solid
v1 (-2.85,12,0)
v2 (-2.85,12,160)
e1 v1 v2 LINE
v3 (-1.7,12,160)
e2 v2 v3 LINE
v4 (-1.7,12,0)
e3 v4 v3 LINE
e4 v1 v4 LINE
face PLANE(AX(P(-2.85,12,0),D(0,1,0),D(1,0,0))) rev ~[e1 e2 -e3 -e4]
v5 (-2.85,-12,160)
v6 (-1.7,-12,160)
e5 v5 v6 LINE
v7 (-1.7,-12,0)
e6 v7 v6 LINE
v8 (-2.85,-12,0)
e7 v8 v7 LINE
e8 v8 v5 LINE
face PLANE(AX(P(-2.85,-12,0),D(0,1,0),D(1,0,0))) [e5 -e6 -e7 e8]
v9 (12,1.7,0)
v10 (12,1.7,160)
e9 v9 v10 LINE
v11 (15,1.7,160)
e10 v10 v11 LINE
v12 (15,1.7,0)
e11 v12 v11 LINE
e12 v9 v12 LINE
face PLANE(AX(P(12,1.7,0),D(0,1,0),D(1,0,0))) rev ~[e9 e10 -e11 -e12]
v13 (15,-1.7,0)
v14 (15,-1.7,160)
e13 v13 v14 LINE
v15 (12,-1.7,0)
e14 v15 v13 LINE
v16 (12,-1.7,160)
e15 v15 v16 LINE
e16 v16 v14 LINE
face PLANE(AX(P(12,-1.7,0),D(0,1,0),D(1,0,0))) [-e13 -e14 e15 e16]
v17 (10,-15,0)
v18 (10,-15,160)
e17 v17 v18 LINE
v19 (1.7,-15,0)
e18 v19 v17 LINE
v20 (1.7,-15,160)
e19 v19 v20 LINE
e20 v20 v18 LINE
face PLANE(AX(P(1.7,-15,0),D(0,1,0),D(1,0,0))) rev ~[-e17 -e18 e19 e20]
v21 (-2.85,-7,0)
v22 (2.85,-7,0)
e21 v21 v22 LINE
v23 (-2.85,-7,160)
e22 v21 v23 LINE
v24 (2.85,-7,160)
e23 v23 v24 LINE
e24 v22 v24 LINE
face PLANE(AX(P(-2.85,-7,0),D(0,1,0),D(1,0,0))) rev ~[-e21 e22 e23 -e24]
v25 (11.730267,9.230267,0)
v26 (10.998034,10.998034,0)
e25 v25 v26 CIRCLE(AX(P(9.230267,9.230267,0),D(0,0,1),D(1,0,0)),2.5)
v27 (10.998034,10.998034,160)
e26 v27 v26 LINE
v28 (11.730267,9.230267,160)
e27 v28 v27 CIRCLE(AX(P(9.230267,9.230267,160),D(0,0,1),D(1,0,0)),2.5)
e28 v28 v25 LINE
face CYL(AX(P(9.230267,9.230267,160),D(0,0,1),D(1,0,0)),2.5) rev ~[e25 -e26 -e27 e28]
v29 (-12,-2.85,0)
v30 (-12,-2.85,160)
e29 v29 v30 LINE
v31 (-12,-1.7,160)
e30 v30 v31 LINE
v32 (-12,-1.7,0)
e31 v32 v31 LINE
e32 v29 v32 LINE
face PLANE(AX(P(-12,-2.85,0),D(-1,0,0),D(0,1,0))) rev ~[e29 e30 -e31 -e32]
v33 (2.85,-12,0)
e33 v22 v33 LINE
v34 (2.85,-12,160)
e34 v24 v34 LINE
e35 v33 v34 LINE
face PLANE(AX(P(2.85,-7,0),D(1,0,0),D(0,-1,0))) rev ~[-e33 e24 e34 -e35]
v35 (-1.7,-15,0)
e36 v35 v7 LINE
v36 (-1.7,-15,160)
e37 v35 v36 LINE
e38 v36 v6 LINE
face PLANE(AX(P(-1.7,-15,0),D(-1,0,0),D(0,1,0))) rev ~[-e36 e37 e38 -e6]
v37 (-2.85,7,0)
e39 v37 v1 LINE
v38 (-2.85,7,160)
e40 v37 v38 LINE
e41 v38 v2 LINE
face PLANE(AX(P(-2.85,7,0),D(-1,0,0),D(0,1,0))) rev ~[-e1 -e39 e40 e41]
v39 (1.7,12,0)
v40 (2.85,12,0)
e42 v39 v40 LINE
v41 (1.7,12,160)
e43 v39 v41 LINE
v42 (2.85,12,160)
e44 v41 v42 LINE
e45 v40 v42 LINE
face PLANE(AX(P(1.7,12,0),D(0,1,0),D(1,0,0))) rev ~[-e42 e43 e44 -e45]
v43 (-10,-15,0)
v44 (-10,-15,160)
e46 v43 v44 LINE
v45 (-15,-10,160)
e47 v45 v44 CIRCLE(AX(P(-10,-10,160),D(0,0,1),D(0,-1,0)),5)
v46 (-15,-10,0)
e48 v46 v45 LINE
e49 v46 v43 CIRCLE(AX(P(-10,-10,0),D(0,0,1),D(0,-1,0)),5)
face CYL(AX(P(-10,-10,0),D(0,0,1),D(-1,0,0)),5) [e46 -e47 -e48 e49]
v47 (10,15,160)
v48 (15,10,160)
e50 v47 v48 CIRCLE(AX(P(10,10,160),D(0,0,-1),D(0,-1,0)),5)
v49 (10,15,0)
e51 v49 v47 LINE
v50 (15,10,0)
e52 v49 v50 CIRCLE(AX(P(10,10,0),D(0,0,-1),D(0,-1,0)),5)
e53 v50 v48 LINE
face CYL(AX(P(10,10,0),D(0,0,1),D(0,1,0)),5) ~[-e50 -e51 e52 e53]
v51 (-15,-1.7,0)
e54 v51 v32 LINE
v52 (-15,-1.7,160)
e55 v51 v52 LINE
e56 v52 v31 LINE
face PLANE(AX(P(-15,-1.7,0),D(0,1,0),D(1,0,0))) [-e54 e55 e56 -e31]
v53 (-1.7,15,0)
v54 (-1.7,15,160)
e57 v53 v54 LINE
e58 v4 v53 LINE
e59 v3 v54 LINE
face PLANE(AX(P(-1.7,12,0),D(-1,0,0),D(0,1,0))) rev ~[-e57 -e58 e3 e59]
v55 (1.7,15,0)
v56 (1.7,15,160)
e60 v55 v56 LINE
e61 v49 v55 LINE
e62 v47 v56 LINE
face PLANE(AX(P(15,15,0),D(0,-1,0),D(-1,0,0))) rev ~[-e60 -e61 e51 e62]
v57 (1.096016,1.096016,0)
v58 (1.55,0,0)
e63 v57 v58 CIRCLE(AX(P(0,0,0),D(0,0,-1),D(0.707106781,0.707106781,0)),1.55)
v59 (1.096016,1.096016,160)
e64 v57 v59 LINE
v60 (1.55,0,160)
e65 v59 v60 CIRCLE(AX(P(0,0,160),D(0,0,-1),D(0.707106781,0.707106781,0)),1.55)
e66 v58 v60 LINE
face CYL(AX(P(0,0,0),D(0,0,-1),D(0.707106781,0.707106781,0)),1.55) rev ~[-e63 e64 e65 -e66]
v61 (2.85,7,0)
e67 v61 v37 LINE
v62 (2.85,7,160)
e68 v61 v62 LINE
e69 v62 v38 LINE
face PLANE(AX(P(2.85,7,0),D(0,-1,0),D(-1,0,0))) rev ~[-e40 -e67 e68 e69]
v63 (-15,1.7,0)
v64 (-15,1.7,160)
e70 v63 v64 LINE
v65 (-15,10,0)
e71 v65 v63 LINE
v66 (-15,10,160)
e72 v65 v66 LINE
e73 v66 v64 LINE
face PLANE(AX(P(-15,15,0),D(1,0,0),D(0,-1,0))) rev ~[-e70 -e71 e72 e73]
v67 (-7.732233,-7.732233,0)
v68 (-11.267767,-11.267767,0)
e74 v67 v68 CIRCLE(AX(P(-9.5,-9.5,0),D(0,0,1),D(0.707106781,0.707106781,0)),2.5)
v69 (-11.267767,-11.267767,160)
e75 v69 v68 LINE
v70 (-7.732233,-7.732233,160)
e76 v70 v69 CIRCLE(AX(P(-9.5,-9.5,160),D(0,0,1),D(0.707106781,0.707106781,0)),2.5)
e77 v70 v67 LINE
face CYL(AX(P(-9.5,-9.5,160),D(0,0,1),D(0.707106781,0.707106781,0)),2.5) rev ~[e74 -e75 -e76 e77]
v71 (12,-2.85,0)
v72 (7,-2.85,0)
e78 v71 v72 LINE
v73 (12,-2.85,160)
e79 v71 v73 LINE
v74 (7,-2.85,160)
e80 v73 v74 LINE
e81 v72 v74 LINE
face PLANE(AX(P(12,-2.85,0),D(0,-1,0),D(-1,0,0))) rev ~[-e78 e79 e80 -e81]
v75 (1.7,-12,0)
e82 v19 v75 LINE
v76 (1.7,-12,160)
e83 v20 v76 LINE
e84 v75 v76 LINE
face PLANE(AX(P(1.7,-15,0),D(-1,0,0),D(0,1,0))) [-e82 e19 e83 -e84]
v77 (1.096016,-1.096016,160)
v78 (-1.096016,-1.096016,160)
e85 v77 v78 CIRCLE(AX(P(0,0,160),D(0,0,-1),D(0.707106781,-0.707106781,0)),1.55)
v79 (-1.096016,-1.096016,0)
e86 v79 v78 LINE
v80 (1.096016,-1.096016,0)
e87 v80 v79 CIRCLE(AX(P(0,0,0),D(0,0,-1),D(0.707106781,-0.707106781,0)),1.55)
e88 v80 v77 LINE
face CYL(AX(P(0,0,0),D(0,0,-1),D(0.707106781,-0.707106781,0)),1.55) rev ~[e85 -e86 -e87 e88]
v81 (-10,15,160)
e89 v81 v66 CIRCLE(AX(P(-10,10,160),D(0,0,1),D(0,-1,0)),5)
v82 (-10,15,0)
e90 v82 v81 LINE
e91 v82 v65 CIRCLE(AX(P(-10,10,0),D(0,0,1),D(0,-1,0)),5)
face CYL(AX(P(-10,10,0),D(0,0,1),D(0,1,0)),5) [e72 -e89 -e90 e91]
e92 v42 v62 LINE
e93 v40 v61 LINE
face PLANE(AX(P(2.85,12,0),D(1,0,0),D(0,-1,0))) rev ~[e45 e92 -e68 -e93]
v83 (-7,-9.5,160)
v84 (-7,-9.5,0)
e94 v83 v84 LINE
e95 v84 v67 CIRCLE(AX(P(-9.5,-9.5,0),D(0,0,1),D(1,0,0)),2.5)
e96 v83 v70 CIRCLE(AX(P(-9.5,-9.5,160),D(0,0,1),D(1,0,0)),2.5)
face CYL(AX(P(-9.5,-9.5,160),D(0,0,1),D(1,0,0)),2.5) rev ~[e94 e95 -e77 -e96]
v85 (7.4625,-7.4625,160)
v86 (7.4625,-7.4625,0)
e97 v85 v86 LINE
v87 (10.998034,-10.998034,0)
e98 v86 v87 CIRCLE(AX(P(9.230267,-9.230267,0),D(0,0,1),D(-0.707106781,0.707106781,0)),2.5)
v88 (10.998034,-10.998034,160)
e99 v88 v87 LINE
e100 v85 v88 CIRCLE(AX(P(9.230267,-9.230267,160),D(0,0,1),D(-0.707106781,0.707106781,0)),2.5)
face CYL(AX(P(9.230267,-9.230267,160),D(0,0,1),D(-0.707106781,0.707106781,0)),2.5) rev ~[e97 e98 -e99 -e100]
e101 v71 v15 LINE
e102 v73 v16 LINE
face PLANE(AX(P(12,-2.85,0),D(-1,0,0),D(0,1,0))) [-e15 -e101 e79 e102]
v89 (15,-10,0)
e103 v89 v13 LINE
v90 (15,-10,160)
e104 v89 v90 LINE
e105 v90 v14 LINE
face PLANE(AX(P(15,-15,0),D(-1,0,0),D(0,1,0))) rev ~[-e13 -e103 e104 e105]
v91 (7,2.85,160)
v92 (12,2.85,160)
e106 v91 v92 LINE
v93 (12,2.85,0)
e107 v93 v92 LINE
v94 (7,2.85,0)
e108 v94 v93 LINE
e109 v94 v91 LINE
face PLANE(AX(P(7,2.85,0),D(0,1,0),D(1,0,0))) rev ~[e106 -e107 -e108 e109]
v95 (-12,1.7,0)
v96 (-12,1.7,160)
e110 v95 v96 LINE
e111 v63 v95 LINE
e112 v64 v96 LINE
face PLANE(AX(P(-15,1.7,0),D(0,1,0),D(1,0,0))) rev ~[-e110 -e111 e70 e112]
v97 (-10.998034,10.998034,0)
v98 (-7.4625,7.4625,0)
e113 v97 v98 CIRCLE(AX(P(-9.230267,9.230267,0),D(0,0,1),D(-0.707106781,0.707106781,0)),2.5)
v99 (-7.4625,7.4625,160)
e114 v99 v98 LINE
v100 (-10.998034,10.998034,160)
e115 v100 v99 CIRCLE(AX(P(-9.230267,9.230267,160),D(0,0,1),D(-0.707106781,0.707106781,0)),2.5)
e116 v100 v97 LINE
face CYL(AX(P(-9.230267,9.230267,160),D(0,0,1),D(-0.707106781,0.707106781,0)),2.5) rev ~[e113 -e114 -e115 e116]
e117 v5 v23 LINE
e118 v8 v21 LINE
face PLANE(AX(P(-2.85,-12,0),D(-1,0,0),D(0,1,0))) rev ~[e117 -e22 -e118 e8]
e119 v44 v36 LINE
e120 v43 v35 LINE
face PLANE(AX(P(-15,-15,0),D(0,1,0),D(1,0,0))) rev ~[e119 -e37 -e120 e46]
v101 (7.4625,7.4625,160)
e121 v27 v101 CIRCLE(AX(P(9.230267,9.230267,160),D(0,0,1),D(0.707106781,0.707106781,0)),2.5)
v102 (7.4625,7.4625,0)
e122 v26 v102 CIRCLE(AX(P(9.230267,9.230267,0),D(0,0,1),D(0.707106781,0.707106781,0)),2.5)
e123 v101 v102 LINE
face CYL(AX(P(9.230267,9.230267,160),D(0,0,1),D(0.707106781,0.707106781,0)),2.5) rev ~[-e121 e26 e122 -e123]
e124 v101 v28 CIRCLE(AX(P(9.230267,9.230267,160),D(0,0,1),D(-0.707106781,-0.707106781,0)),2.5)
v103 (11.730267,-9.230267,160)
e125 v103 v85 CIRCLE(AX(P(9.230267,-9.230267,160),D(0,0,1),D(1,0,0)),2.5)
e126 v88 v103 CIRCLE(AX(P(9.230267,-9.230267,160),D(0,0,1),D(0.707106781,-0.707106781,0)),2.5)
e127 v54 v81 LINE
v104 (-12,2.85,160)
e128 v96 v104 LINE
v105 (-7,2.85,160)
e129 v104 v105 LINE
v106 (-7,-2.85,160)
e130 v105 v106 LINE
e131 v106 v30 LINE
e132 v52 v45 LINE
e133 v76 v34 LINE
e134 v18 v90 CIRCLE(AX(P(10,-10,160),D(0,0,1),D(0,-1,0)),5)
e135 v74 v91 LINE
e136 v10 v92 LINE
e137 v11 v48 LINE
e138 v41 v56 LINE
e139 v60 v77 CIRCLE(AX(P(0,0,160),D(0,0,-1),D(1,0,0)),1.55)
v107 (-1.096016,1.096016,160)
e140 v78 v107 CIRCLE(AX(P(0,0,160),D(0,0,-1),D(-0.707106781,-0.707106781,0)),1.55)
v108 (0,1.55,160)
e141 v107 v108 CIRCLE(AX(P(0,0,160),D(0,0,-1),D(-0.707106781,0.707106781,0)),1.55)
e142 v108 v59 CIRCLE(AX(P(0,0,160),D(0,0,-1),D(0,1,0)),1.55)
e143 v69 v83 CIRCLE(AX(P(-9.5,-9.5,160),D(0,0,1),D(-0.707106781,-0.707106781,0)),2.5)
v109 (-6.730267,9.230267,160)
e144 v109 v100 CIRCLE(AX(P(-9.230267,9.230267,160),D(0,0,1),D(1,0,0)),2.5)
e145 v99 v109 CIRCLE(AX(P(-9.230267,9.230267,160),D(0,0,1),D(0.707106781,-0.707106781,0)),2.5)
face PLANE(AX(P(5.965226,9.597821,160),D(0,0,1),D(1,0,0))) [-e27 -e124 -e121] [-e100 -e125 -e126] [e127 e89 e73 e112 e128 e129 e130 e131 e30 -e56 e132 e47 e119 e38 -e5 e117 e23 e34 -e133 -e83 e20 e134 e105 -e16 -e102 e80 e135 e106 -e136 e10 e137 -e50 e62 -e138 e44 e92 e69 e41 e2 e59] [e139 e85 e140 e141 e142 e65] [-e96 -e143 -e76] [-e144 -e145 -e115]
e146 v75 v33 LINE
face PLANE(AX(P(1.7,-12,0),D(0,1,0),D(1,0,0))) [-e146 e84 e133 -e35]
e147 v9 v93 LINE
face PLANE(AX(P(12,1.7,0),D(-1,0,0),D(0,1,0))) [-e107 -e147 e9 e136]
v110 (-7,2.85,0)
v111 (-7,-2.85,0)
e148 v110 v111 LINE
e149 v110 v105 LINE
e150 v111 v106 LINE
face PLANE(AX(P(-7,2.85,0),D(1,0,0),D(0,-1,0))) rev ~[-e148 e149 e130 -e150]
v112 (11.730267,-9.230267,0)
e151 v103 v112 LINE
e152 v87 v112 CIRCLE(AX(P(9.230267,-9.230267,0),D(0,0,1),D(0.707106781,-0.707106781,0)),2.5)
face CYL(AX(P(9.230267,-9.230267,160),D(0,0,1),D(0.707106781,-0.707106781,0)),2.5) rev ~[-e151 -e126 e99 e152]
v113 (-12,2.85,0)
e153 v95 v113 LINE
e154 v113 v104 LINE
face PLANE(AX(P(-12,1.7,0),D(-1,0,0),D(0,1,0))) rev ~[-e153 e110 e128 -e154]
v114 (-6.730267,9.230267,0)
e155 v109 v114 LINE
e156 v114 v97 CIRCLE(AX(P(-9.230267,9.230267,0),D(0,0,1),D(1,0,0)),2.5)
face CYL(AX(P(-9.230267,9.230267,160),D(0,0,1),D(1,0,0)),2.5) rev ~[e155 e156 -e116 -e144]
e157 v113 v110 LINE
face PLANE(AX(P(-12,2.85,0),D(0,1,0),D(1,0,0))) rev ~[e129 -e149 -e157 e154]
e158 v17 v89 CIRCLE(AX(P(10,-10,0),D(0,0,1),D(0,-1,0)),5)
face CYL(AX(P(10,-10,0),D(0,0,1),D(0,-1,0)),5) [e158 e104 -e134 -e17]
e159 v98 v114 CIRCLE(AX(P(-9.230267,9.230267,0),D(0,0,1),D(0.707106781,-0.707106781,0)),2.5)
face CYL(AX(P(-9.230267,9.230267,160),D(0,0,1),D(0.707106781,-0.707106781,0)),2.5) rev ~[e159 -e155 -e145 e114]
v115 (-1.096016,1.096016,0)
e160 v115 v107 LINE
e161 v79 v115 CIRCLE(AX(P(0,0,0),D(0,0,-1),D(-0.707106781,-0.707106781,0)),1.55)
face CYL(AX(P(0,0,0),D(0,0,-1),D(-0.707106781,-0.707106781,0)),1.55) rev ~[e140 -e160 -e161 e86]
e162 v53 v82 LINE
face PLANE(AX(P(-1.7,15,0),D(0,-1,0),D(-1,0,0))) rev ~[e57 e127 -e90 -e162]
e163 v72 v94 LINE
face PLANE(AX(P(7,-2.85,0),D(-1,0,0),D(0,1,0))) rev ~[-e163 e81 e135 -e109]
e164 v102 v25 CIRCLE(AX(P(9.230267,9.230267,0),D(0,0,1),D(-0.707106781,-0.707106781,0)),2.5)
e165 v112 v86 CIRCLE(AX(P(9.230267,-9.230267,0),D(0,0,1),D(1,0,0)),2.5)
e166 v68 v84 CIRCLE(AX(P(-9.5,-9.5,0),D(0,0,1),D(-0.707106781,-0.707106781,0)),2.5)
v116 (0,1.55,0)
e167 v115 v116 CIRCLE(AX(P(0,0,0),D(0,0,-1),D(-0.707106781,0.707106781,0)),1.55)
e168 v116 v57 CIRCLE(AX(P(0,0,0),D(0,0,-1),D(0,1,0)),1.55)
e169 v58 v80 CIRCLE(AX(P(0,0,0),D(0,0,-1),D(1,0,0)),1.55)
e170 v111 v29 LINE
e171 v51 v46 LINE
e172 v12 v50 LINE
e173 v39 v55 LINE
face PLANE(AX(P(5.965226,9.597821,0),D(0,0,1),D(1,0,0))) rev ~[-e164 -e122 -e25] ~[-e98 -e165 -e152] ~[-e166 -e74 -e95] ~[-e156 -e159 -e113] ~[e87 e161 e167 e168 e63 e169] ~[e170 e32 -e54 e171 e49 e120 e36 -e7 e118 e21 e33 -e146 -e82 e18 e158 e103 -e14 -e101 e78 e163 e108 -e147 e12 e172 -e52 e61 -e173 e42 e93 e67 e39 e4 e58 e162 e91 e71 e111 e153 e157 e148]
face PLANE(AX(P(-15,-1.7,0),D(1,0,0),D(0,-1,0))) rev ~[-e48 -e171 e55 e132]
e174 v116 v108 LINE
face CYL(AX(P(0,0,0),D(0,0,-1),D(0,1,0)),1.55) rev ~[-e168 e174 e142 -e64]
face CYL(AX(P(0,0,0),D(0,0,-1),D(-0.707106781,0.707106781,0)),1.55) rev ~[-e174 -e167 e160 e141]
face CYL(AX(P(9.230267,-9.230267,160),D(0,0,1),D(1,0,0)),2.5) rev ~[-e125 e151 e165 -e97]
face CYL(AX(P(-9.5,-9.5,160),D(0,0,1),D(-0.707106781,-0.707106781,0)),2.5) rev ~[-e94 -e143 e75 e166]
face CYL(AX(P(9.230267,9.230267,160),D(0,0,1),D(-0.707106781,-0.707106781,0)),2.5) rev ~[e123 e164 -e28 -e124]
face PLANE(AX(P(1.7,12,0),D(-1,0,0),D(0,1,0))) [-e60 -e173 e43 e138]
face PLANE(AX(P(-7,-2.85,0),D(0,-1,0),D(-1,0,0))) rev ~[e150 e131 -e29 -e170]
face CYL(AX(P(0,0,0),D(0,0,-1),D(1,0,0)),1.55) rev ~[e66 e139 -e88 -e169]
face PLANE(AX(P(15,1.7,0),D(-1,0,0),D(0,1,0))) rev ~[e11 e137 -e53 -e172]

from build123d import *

# Parameters (mm, degrees)
F0_W     = 1.15
F0_H     = 3
F0_W_2   = 3
F0_H_2   = 1.15
F1_DEPTH = 160
F2_R     = 5
F4_DEPTH = 200


with BuildPart() as f1:
    # F0 (on Top) → F1 (new body)
    with BuildSketch(Plane.XY):
        with BuildLine():
            Line((7.5, 7.5), (15, 15))
            Line((15, 15), (2.85, 15))
            Line((2.85, 15), (2.85, 12))
            Line((2.85, 12), (2.85, 7))
            Line((2.85, 7), (0, 7))
            Line((0, 7), (0, 1.55))
            ThreePointArc((0, 1.55), (0.5931593202, 1.4320132754), (1.0960155108, 1.0960155108))
            Line((1.0960155108, 1.0960155108), (7.5, 7.5))
        make_face()
        with BuildLine():
            Line((15, 2.85), (15, 15))
            Line((15, 15), (7.5, 7.5))
            Line((7.5, 7.5), (1.0960155108, 1.0960155108))
            ThreePointArc((1.0960155108, 1.0960155108), (1.4320132754, 0.5931593202), (1.55, 0))
            ThreePointArc((1.55, 0), (1.4320132754, -0.5931593202), (1.0960155108, -1.0960155108))
            Line((1.0960155108, -1.0960155108), (7.5, -7.5))
            Line((7.5, -7.5), (15, -15))
            Line((15, -15), (15, -2.85))
            Line((15, -2.85), (12, -2.85))
            Line((12, -2.85), (7, -2.85))
            Line((7, -2.85), (7, 2.85))
            Line((7, 2.85), (12, 2.85))
            Line((12, 2.85), (15, 2.85))
        make_face()
        with Locations((2.275, 13.5)):
            Rectangle(F0_W, F0_H)
        with Locations((13.5, 2.275)):
            Rectangle(F0_W_2, F0_H_2)
        with BuildLine():
            ThreePointArc((-1.0960155108, 1.0960155108), (-0.5931593202, 1.4320132754), (0, 1.55))
            Line((0, 1.55), (0, 7))
            Line((0, 7), (-2.85, 7))
            Line((-2.85, 7), (-2.85, 12))
            Line((-2.85, 12), (-2.85, 15))
            Line((-2.85, 15), (-15, 15))
            Line((-15, 15), (-7.5, 7.5))
            Line((-7.5, 7.5), (-1.0960155108, 1.0960155108))
        make_face()
        with Locations((-2.275, 13.5)):
            Rectangle(F0_W, F0_H)
        with Locations((13.5, -2.275)):
            Rectangle(F0_W_2, F0_H_2)
        with BuildLine():
            Line((7.5, -7.5), (1.0960155108, -1.0960155108))
            ThreePointArc((1.0960155108, -1.0960155108), (0, -1.55), (-1.0960155108, -1.0960155108))
            Line((-1.0960155108, -1.0960155108), (-7.5, -7.5))
            Line((-7.5, -7.5), (-15, -15))
            Line((-15, -15), (-2.85, -15))
            Line((-2.85, -15), (-2.85, -12))
            Line((-2.85, -12), (-2.85, -7))
            Line((-2.85, -7), (2.85, -7))
            Line((2.85, -7), (2.85, -12))
            Line((2.85, -12), (2.85, -15))
            Line((2.85, -15), (15, -15))
            Line((15, -15), (7.5, -7.5))
        make_face()
        with BuildLine():
            ThreePointArc((-1.0960155108, -1.0960155108), (-1.55, 0), (-1.0960155108, 1.0960155108))
            Line((-1.0960155108, 1.0960155108), (-7.5, 7.5))
            Line((-7.5, 7.5), (-15, 15))
            Line((-15, 15), (-15, 2.85))
            Line((-15, 2.85), (-12, 2.85))
            Line((-12, 2.85), (-7, 2.85))
            Line((-7, 2.85), (-7, -2.85))
            Line((-7, -2.85), (-12, -2.85))
            Line((-12, -2.85), (-15, -2.85))
            Line((-15, -2.85), (-15, -15))
            Line((-15, -15), (-7.5, -7.5))
            Line((-7.5, -7.5), (-1.0960155108, -1.0960155108))
        make_face()
        with Locations((-13.5, 2.275)):
            Rectangle(F0_W_2, F0_H_2)
        with Locations((2.275, -13.5)):
            Rectangle(F0_W, F0_H)
        with Locations((-2.275, -13.5)):
            Rectangle(F0_W, F0_H)
        with Locations((-13.5, -2.275)):
            Rectangle(F0_W_2, F0_H_2)
    extrude(amount=F1_DEPTH)

    # F2
    f2_edges = [f1.edges().sort_by_distance(p)[0] for p in [
        (15, -15, 80),
        (-15, -15, 80),
        (15, 15, 80),
        (-15, 15, 80),
    ]]
    fillet(f2_edges, radius=F2_R)

    # F3 (on face) → F4 (cut)
    with BuildSketch(Plane.XY.offset(160)):
        with BuildLine():
            ThreePointArc((-7, -9.5), (-7.1903011687, -8.5432914191), (-7.732233047, -7.732233047))
            Line((-7.732233047, -7.732233047), (-11.267766953, -11.267766953))
            ThreePointArc((-11.267766953, -11.267766953), (-8.5432914191, -11.8096988313), (-7, -9.5))
        make_face()
        with BuildLine():
            Line((-11.267766953, -11.267766953), (-7.732233047, -7.732233047))
            ThreePointArc((-7.732233047, -7.732233047), (-11.267766953, -7.732233047), (-11.267766953, -11.267766953))
        make_face()
        with BuildLine():
            ThreePointArc((11.730266953, -9.230266953), (10.1869755339, -6.9205681217), (7.4625, -7.4625))
            Line((7.4625, -7.4625), (10.9980339059, -10.9980339059))
            ThreePointArc((10.9980339059, -10.9980339059), (11.5399657842, -10.1869755339), (11.730266953, -9.230266953))
        make_face()
        with BuildLine():
            Line((10.9980339059, -10.9980339059), (7.4625, -7.4625))
            ThreePointArc((7.4625, -7.4625), (7.4625, -10.9980339059), (10.9980339059, -10.9980339059))
        make_face()
        with BuildLine():
            ThreePointArc((10.9980339059, 10.9980339059), (7.4625, 10.9980339059), (7.4625, 7.4625))
            Line((7.4625, 7.4625), (10.9980339059, 10.9980339059))
        make_face()
        with BuildLine():
            Line((10.9980339059, 10.9980339059), (7.4625, 7.4625))
            ThreePointArc((7.4625, 7.4625), (10.1869755339, 6.9205681217), (11.730266953, 9.230266953))
            ThreePointArc((11.730266953, 9.230266953), (11.5399657842, 10.1869755339), (10.9980339059, 10.9980339059))
        make_face()
        with BuildLine():
            ThreePointArc((-10.9980339059, 10.9980339059), (-10.9980339059, 7.4625), (-7.4625, 7.4625))
            Line((-7.4625, 7.4625), (-10.9980339059, 10.9980339059))
        make_face()
        with BuildLine():
            Line((-10.9980339059, 10.9980339059), (-7.4625, 7.4625))
            ThreePointArc((-7.4625, 7.4625), (-6.9205681217, 8.2735583721), (-6.730266953, 9.230266953))
            ThreePointArc((-6.730266953, 9.230266953), (-8.2735583721, 11.5399657842), (-10.9980339059, 10.9980339059))
        make_face()
    extrude(amount=-F4_DEPTH, mode=Mode.SUBTRACT)


solid = f1.part
